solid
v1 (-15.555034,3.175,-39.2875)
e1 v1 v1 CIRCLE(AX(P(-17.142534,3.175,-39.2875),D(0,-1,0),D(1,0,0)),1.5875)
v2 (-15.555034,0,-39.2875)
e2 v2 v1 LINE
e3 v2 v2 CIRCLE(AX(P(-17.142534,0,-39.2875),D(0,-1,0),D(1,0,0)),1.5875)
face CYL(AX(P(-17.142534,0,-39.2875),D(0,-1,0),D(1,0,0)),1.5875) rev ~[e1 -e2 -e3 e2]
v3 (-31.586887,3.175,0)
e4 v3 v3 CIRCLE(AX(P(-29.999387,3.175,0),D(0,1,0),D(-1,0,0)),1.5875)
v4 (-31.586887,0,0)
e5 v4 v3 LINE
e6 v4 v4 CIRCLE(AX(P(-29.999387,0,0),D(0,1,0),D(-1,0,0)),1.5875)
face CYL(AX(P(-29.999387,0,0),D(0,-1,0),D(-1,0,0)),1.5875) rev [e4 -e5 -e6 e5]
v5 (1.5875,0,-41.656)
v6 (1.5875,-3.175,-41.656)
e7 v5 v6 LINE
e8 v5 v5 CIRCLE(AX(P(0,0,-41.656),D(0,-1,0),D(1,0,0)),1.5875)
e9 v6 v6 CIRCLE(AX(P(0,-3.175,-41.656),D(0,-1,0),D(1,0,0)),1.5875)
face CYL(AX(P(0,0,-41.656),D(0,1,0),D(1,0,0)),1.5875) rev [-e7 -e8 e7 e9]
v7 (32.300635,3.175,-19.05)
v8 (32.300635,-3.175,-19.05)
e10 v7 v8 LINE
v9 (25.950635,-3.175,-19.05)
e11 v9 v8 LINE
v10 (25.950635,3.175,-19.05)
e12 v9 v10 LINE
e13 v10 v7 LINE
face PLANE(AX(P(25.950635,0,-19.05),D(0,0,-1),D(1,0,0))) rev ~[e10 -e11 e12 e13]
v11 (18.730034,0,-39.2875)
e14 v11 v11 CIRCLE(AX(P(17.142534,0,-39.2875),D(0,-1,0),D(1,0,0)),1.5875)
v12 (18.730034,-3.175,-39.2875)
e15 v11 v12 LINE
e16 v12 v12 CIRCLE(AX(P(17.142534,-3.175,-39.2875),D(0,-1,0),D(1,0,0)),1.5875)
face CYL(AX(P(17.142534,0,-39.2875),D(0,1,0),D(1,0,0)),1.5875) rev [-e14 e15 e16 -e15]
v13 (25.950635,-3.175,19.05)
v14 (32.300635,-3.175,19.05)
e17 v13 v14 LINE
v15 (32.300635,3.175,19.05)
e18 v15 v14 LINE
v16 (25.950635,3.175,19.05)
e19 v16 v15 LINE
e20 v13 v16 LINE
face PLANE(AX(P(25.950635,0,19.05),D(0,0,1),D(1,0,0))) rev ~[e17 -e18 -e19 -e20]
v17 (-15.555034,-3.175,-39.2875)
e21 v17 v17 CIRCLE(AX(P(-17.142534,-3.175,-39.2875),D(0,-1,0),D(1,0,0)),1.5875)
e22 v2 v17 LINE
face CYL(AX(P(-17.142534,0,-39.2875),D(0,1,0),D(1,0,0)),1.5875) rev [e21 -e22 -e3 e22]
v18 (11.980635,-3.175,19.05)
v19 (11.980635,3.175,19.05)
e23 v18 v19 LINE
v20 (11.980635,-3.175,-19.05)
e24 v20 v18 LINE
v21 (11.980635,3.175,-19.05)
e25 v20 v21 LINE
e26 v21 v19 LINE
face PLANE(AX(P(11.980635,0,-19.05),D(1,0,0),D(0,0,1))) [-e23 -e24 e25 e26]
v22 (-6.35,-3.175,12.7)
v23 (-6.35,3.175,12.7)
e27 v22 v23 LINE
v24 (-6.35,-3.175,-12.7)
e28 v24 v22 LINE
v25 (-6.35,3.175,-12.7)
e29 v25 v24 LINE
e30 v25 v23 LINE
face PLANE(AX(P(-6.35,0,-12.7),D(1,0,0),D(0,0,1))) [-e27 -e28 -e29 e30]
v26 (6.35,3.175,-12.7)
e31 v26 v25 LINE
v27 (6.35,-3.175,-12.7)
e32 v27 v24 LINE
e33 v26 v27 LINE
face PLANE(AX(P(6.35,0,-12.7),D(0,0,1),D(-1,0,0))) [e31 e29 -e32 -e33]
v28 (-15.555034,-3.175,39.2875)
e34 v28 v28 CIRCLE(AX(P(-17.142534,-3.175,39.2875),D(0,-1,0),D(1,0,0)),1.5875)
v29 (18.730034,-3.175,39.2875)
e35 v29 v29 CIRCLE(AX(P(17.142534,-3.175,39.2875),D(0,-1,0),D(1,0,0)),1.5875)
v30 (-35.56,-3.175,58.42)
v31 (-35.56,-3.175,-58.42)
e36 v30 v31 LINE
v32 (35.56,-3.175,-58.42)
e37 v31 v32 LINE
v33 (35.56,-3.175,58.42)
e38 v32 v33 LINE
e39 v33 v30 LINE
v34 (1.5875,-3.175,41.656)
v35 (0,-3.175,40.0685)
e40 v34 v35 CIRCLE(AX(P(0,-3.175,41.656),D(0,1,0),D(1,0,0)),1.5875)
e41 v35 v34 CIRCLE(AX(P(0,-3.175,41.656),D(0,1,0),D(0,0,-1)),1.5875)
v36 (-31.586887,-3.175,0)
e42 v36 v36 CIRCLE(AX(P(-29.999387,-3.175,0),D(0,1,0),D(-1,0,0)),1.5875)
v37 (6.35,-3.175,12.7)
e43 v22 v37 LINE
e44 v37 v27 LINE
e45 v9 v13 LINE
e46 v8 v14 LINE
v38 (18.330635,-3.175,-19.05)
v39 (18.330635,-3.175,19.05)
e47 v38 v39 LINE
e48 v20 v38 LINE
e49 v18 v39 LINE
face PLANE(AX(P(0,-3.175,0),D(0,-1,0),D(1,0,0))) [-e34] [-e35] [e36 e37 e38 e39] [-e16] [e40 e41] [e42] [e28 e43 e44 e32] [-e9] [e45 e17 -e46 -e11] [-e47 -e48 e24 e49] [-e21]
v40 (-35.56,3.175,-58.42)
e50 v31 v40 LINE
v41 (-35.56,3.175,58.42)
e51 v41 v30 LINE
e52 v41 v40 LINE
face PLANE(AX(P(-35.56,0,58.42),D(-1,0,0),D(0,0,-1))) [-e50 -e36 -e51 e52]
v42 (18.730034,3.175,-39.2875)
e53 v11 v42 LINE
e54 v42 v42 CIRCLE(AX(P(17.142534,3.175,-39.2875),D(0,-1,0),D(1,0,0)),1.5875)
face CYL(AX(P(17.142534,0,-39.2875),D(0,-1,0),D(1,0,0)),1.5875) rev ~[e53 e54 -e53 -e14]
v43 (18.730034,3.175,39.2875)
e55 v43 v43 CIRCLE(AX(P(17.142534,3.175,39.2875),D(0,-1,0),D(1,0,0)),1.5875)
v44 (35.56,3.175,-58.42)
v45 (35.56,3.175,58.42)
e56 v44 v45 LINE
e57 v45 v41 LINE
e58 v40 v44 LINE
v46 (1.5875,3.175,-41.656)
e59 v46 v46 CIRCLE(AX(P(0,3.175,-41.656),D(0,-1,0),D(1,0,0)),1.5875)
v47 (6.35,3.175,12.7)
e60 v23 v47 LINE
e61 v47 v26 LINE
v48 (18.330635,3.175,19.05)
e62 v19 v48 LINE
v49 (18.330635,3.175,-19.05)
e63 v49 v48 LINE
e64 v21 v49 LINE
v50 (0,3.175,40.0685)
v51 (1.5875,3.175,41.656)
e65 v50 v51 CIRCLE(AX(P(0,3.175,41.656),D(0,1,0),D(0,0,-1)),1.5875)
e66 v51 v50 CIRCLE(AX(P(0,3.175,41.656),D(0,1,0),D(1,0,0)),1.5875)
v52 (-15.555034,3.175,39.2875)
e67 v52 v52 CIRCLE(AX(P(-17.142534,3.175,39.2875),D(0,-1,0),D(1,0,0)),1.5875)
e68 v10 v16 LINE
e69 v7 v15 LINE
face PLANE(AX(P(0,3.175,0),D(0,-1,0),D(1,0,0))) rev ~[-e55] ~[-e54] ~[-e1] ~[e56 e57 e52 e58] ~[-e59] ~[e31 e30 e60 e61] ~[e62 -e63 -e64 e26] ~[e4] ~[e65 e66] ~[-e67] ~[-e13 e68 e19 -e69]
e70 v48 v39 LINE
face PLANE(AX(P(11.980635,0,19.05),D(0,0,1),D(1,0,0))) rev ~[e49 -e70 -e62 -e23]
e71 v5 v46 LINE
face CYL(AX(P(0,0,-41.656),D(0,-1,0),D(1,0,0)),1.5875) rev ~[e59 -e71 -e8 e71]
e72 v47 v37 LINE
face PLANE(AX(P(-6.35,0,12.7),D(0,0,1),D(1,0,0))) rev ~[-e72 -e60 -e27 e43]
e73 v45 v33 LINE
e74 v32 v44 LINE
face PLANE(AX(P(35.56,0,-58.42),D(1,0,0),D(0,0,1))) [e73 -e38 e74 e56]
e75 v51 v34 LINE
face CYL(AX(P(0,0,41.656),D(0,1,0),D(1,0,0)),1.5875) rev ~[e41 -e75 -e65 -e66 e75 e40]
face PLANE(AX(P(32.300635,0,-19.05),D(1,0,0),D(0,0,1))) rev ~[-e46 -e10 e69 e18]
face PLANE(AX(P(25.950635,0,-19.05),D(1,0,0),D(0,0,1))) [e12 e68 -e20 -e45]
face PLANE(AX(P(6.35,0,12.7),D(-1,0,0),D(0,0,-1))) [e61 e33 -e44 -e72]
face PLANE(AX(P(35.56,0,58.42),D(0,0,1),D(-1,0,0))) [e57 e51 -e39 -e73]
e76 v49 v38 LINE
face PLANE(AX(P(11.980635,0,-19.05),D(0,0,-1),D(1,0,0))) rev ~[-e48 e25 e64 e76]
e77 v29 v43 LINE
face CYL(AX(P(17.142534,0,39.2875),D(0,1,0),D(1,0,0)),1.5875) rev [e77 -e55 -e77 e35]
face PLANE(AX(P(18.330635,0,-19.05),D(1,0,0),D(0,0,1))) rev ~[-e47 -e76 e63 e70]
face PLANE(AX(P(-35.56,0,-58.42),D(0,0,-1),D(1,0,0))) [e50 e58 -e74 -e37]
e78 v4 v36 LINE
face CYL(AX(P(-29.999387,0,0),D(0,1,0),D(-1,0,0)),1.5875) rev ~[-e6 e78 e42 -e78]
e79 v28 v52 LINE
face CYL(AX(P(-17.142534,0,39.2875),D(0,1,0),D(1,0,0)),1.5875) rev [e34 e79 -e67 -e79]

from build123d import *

# Parameters (mm, degrees)
F0_R     = 1.5875
F0_W     = 6.35
F0_H     = 38.1
F1_DEPTH = 3.175
F2_DEPTH = 2.54


# Not quite as in the source:
# - a feature names something its author has since deleted; it is built from what else it names


with BuildPart() as f1:
    # F0 (on Front) → F1 (new body, symmetric)
    with BuildSketch(Plane.XZ):
        Polygon((35.56, -58.42), (35.56, 58.42), (-35.56, 58.42), (-35.56, 0), (-35.56, -58.42), align=None)
        with Locations((-17.1425342897, -39.2875)):
            Circle(F0_R, mode=Mode.SUBTRACT)
        with Locations((0, -41.656)):
            Circle(F0_R, mode=Mode.SUBTRACT)
        with BuildLine():
            ThreePointArc((-28.4118865192, 0), (-29.9993865192, -1.5875), (-31.5868865192, 0))
            ThreePointArc((-31.5868865192, 0), (-29.9993865192, 1.5875), (-28.4118865192, 0))
        make_face(mode=Mode.SUBTRACT)
        Polygon((-6.35, -12.7), (-6.35, 12.7), (0, 12.7), (6.35, 12.7), (6.35, -12.7), align=None, mode=Mode.SUBTRACT)
        with Locations((17.1425342897, -39.2875)):
            Circle(F0_R, mode=Mode.SUBTRACT)
        with Locations((15.1556345809, 0)):
            Rectangle(F0_W, F0_H, mode=Mode.SUBTRACT)
        with Locations((29.1256345809, 0)):
            Rectangle(F0_W, F0_H, mode=Mode.SUBTRACT)
        with Locations((-17.1425342897, 39.2875)):
            Circle(F0_R, mode=Mode.SUBTRACT)
        with BuildLine():
            ThreePointArc((1.5875, 41.656), (1.1225320151, 40.5334679849), (0, 40.0685))
            ThreePointArc((0, 40.0685), (-1.1225320151, 42.7785320151), (1.5875, 41.656))
        make_face(mode=Mode.SUBTRACT)
        with Locations((17.1425342897, 39.2875)):
            Circle(F0_R, mode=Mode.SUBTRACT)
    extrude(amount=F1_DEPTH, both=True)

    # F0 (on Front) → F2 (cut)
    with BuildSketch(Plane.XZ):
        with Locations((15.1556345809, 0)):
            Rectangle(F0_W, F0_H)
        with Locations((29.1256345809, 0)):
            Rectangle(F0_W, F0_H)
    extrude(amount=-F2_DEPTH, mode=Mode.SUBTRACT)


solid = f1.part
